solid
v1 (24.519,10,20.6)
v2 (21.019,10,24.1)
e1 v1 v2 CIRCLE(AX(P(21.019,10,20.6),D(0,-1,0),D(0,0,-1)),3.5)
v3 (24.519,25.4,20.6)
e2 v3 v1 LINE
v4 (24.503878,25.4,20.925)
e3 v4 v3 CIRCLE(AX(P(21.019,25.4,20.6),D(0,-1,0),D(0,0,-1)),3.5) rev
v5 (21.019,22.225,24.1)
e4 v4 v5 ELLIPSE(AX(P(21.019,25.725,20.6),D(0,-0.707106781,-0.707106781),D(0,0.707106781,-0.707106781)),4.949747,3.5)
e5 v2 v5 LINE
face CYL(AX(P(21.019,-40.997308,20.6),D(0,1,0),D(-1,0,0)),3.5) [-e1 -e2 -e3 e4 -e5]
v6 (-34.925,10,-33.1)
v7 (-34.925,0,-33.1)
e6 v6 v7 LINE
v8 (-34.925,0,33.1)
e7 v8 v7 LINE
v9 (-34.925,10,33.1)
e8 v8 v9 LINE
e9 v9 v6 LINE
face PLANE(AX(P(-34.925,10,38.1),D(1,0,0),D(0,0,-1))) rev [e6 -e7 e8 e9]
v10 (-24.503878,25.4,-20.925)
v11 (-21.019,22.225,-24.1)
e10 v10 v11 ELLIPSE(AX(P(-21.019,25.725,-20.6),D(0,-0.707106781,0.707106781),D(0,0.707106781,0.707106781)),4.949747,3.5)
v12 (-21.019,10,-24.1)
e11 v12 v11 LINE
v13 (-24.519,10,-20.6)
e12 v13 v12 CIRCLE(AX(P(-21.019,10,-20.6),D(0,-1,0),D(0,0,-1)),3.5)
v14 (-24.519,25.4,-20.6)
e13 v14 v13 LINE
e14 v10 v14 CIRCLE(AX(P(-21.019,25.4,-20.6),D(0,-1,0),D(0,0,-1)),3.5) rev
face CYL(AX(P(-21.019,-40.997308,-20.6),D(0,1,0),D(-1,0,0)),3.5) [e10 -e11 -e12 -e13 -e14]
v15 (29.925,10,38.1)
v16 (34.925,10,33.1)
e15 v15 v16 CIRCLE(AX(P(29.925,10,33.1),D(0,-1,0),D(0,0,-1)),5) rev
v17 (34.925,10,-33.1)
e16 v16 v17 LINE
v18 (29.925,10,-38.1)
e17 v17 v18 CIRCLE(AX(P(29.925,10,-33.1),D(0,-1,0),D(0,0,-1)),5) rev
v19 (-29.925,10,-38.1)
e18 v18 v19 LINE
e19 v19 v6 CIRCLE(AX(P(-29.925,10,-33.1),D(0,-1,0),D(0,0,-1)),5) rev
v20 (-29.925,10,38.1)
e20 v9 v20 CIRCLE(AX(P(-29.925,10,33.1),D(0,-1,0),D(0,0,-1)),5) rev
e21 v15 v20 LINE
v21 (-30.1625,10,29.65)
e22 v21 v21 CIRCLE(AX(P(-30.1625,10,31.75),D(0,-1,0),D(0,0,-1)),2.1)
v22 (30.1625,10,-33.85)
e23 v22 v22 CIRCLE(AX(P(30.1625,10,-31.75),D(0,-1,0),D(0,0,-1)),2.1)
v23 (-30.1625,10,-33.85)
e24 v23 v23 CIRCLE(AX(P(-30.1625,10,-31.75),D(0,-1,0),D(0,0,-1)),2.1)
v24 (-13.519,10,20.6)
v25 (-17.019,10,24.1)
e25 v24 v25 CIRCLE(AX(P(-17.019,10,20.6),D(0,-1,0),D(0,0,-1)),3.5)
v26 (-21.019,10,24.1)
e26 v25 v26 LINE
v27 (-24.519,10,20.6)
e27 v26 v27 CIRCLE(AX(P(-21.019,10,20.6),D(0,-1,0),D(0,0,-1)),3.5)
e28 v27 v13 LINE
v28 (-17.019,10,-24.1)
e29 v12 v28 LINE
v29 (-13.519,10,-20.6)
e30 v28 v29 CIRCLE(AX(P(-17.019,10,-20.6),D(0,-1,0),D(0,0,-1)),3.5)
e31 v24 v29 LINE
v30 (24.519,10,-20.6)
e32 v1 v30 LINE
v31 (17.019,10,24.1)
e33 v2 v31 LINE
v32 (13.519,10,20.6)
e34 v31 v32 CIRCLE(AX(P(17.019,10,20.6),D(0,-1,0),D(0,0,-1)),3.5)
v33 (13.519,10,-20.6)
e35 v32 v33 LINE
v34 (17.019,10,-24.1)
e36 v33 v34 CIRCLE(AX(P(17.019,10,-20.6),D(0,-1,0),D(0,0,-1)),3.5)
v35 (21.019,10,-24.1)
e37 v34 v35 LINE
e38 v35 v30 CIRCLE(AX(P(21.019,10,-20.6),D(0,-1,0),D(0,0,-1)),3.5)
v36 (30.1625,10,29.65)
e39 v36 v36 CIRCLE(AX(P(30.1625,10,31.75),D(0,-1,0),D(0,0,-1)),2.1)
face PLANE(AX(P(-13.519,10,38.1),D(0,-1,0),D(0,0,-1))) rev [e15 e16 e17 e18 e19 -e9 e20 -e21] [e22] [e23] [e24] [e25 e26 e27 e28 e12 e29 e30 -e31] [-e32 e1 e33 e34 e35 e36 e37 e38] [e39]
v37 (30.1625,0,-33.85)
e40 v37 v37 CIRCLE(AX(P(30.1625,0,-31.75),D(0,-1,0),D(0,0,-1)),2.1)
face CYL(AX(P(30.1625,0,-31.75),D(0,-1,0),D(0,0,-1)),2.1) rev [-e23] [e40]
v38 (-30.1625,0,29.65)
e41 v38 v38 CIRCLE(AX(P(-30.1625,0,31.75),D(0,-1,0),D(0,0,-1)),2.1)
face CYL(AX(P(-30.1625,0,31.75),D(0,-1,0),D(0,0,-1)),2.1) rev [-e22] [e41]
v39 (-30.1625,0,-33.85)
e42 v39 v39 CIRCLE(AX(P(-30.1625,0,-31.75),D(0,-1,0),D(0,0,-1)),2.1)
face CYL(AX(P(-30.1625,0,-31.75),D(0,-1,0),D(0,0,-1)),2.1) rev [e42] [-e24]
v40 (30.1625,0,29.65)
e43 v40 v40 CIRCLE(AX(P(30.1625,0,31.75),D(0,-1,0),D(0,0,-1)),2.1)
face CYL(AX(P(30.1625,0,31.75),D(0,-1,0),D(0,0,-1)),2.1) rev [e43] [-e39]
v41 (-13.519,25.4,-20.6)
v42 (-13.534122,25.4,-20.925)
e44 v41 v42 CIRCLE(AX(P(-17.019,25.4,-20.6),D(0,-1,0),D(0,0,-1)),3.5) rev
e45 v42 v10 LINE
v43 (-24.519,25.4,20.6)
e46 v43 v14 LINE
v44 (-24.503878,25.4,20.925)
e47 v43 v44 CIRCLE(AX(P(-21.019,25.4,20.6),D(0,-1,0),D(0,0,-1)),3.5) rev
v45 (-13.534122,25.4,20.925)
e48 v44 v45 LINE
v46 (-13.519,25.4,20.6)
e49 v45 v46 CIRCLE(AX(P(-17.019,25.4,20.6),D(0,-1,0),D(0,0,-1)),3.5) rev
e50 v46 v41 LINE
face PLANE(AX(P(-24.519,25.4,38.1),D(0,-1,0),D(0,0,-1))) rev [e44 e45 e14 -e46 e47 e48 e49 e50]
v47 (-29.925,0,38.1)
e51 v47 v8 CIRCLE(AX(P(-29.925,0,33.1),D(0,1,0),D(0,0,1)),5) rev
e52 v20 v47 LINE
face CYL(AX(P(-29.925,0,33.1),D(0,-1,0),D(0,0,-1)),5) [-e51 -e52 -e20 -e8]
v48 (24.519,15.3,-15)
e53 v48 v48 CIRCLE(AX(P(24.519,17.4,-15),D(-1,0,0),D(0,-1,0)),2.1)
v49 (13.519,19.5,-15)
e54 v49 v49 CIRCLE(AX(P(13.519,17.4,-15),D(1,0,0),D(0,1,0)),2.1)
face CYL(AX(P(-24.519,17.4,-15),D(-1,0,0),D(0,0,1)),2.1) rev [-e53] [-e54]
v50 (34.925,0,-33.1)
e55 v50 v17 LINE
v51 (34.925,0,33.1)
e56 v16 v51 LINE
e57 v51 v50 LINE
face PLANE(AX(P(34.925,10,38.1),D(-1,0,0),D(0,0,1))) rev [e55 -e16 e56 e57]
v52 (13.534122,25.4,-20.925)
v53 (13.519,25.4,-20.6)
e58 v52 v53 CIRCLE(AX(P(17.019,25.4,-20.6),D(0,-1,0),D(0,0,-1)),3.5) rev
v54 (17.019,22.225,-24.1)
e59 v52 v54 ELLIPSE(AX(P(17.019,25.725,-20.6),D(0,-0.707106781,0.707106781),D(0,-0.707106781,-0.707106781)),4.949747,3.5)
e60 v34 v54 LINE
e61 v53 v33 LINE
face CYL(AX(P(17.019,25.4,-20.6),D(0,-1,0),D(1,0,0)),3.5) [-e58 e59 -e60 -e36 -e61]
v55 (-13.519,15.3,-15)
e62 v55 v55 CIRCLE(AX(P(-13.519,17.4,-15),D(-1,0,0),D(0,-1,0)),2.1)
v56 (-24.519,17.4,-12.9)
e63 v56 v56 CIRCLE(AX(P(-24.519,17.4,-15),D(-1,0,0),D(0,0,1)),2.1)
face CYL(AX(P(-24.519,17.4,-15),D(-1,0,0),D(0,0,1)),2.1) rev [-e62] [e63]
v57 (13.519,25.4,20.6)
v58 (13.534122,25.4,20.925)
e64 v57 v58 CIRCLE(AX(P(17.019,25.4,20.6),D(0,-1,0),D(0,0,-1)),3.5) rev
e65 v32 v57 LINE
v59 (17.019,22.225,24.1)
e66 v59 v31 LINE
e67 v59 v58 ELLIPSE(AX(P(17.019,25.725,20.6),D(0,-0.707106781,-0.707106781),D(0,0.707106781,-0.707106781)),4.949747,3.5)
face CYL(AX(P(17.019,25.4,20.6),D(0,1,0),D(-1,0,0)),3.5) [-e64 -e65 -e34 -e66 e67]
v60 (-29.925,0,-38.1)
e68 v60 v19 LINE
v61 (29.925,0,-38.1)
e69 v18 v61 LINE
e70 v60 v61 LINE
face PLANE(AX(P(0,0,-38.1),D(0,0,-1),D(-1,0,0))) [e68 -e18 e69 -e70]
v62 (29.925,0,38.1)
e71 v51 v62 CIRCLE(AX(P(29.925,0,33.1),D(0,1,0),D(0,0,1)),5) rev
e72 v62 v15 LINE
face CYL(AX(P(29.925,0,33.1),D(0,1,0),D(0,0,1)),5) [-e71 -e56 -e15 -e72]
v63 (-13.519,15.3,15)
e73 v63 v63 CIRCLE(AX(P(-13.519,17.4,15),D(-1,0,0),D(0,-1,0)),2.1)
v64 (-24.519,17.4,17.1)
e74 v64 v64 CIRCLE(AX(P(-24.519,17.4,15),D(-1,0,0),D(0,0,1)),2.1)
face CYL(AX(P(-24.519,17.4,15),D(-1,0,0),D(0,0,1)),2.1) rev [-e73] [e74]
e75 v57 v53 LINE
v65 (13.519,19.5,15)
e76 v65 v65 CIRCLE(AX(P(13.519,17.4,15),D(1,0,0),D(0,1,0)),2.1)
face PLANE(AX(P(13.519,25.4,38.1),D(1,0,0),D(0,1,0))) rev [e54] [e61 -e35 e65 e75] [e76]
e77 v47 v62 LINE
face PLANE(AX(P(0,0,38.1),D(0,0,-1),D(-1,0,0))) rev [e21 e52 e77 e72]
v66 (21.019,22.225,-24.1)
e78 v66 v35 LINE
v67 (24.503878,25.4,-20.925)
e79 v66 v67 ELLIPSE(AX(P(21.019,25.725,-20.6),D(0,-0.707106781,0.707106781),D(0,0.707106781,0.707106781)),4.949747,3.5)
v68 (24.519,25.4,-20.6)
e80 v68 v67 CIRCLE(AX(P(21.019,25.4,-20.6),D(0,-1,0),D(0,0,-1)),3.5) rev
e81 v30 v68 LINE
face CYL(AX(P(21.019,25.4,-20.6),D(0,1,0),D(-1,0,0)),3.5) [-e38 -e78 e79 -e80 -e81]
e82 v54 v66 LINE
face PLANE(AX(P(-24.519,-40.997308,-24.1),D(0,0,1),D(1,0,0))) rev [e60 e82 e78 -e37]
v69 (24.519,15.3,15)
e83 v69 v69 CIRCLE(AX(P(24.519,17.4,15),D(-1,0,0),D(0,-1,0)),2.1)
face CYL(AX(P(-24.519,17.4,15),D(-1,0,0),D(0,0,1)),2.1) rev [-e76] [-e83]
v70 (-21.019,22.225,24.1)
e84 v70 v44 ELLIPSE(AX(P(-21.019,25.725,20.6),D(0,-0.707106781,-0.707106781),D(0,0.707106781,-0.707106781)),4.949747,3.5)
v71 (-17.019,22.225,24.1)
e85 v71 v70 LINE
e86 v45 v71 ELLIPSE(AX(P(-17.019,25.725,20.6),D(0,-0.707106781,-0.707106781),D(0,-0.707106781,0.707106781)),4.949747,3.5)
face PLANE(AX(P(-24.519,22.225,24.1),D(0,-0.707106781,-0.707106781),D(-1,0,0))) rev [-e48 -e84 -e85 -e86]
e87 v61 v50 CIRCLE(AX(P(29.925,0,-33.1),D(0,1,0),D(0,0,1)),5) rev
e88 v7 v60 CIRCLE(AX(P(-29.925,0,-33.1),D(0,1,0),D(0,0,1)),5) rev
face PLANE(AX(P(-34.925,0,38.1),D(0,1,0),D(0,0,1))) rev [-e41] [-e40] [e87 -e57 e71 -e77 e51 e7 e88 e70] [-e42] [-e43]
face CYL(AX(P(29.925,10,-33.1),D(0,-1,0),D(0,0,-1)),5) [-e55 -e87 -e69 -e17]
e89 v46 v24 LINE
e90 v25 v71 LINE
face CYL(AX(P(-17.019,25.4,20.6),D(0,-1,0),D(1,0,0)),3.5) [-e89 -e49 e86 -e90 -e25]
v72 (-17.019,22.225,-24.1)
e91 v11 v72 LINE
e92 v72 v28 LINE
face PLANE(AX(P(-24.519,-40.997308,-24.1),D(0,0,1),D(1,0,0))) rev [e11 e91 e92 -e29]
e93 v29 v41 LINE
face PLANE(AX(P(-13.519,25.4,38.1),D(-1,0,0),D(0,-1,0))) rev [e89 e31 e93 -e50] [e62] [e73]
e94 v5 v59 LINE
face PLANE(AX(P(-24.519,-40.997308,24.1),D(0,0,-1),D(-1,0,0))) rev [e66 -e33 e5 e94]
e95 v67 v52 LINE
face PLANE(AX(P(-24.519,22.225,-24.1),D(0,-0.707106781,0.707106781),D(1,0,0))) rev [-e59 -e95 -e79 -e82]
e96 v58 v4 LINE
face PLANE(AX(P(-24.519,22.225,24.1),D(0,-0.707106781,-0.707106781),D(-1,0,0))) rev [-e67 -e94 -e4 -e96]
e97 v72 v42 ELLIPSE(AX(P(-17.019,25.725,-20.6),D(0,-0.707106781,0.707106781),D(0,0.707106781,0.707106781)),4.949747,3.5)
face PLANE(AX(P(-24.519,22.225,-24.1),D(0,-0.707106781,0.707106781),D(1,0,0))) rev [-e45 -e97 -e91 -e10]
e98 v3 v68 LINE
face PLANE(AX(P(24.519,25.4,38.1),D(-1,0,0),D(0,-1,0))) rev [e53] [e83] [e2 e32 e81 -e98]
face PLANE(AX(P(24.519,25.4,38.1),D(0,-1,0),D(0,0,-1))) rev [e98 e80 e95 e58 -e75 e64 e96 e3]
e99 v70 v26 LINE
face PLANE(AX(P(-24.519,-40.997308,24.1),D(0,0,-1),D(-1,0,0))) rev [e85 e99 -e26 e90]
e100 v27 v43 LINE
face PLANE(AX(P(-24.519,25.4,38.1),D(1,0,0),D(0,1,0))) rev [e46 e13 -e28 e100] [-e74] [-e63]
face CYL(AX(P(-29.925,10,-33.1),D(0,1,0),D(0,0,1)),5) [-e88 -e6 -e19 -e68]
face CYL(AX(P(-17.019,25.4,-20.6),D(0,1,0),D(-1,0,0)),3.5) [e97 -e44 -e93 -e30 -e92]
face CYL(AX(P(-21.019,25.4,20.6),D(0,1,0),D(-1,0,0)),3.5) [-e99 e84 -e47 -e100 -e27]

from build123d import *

# Parameters (mm, degrees)
BOSS_EXTRUDE1_DEPTH         = 38.1
SKETCH2_W                   = 49.038
SKETCH2_H                   = 14
CUT_EXTRUDE1_DEPTH          = 15.4
FILLET1_R                   = 3.5
TAP_DRILL_FOR_M5X0_8_TAP2_D = 4.2
TAP_DRILL_FOR_M5X0_8_TAP3_D = 4.2
CHAMFER1_SIZE               = 3.175
FILLET4_R                   = 5


with BuildPart() as part:
    # Sketch1 → Boss-Extrude1 (new, symmetric)
    with BuildSketch(Plane.XY):
        Polygon((-24.519, 25.4), (-24.519, 10), (-34.925, 10), (-34.925, 0), (34.925, 0), (34.925, 10), (24.519, 10), (24.519, 25.4), (13.519, 25.4), (13.519, 10), (-13.519, 10), (-13.519, 25.4), align=None)
    extrude(amount=BOSS_EXTRUDE1_DEPTH, both=True)

    # Sketch2 → Cut-Extrude1 (cut)
    with BuildSketch(Plane(origin=(0, 25.4, 0), x_dir=(1, 0, 0), z_dir=(0, 1, 0))):
        with Locations((0, 31.1)):
            Rectangle(SKETCH2_W, SKETCH2_H)
        with Locations((0, -31.1)):
            Rectangle(SKETCH2_W, SKETCH2_H)
    extrude(amount=-CUT_EXTRUDE1_DEPTH, mode=Mode.SUBTRACT)

    # Fillet1
    fillet1_edges = [part.edges().sort_by_distance(p)[0] for p in [
        (-13.519, 17.7, -24.1),
        (13.519, 17.7, -24.1),
        (24.519, 17.7, -24.1),
        (-24.519, 17.7, -24.1),
        (-13.519, 17.7, 24.1),
        (13.519, 17.7, 24.1),
        (-24.519, 17.7, 24.1),
        (24.519, 17.7, 24.1),
    ]]
    fillet(fillet1_edges, radius=FILLET1_R)

    # Tap Drill for M5x0.8 Tap2 (through all)
    with Locations(Plane(origin=(0, 0, 0), x_dir=(-1, 0, 0), z_dir=(0, -1, 0))):
        with Locations((-30.1625, 31.75), (30.1625, 31.75), (30.1625, -31.75), (-30.1625, -31.75)):
            Hole(TAP_DRILL_FOR_M5X0_8_TAP2_D / 2)

    # Tap Drill for M5x0.8 Tap3 (through all)
    with Locations(Plane.ZY.offset(24.519)):
        with Locations((-15, 17.4), (15, 17.4)):
            Hole(TAP_DRILL_FOR_M5X0_8_TAP3_D / 2)

    # Chamfer1
    # the kernel refuses this chamfer: 3.175 mm, written as the material it takes off along each edge
    with BuildSketch(Plane(origin=(29.184093487, 25.4, -24.1), x_dir=(0, -0.9996219169112968, -0.027495876610586726), z_dir=(-1, 0, 0)), Plane(origin=(-8.853906513, 25.4, 24.1), x_dir=(0, 0.027495876610586726, -0.9996219169112968), z_dir=(-1, 0, 0))) as chamfer1_piece_1:
        Polygon((CHAMFER1_SIZE * 0.999621916911, CHAMFER1_SIZE * 0.0274958766106), (-CHAMFER1_SIZE * 0.0274958766106, CHAMFER1_SIZE * 0.999621916911), (0, 0), align=None)
    extrude(amount=20.330186974, mode=Mode.SUBTRACT)
    with BuildSketch(Plane(origin=(29.184093487, 25.4, 24.1), x_dir=(0, -0.9996219169112968, 0.027495876610586726), z_dir=(-1, 0, 0)), Plane(origin=(-8.853906513, 25.4, -24.1), x_dir=(0, 0.027495876610586726, 0.9996219169112968), z_dir=(-1, 0, 0))) as chamfer1_piece_2:
        Polygon((CHAMFER1_SIZE * 0.999621916911, -CHAMFER1_SIZE * 0.0274958766106), (-CHAMFER1_SIZE * 0.0274958766106, -CHAMFER1_SIZE * 0.999621916911), (0, 0), align=None)
    extrude(amount=20.330186974, mode=Mode.SUBTRACT)

    # Fillet4
    fillet4_edges = [part.edges().sort_by_distance(p)[0] for p in [
        (-34.925, 5, 38.1),
        (34.925, 5, -38.1),
        (-34.925, 5, -38.1),
        (34.925, 5, 38.1),
    ]]
    fillet(fillet4_edges, radius=FILLET4_R)


solid = part.part
